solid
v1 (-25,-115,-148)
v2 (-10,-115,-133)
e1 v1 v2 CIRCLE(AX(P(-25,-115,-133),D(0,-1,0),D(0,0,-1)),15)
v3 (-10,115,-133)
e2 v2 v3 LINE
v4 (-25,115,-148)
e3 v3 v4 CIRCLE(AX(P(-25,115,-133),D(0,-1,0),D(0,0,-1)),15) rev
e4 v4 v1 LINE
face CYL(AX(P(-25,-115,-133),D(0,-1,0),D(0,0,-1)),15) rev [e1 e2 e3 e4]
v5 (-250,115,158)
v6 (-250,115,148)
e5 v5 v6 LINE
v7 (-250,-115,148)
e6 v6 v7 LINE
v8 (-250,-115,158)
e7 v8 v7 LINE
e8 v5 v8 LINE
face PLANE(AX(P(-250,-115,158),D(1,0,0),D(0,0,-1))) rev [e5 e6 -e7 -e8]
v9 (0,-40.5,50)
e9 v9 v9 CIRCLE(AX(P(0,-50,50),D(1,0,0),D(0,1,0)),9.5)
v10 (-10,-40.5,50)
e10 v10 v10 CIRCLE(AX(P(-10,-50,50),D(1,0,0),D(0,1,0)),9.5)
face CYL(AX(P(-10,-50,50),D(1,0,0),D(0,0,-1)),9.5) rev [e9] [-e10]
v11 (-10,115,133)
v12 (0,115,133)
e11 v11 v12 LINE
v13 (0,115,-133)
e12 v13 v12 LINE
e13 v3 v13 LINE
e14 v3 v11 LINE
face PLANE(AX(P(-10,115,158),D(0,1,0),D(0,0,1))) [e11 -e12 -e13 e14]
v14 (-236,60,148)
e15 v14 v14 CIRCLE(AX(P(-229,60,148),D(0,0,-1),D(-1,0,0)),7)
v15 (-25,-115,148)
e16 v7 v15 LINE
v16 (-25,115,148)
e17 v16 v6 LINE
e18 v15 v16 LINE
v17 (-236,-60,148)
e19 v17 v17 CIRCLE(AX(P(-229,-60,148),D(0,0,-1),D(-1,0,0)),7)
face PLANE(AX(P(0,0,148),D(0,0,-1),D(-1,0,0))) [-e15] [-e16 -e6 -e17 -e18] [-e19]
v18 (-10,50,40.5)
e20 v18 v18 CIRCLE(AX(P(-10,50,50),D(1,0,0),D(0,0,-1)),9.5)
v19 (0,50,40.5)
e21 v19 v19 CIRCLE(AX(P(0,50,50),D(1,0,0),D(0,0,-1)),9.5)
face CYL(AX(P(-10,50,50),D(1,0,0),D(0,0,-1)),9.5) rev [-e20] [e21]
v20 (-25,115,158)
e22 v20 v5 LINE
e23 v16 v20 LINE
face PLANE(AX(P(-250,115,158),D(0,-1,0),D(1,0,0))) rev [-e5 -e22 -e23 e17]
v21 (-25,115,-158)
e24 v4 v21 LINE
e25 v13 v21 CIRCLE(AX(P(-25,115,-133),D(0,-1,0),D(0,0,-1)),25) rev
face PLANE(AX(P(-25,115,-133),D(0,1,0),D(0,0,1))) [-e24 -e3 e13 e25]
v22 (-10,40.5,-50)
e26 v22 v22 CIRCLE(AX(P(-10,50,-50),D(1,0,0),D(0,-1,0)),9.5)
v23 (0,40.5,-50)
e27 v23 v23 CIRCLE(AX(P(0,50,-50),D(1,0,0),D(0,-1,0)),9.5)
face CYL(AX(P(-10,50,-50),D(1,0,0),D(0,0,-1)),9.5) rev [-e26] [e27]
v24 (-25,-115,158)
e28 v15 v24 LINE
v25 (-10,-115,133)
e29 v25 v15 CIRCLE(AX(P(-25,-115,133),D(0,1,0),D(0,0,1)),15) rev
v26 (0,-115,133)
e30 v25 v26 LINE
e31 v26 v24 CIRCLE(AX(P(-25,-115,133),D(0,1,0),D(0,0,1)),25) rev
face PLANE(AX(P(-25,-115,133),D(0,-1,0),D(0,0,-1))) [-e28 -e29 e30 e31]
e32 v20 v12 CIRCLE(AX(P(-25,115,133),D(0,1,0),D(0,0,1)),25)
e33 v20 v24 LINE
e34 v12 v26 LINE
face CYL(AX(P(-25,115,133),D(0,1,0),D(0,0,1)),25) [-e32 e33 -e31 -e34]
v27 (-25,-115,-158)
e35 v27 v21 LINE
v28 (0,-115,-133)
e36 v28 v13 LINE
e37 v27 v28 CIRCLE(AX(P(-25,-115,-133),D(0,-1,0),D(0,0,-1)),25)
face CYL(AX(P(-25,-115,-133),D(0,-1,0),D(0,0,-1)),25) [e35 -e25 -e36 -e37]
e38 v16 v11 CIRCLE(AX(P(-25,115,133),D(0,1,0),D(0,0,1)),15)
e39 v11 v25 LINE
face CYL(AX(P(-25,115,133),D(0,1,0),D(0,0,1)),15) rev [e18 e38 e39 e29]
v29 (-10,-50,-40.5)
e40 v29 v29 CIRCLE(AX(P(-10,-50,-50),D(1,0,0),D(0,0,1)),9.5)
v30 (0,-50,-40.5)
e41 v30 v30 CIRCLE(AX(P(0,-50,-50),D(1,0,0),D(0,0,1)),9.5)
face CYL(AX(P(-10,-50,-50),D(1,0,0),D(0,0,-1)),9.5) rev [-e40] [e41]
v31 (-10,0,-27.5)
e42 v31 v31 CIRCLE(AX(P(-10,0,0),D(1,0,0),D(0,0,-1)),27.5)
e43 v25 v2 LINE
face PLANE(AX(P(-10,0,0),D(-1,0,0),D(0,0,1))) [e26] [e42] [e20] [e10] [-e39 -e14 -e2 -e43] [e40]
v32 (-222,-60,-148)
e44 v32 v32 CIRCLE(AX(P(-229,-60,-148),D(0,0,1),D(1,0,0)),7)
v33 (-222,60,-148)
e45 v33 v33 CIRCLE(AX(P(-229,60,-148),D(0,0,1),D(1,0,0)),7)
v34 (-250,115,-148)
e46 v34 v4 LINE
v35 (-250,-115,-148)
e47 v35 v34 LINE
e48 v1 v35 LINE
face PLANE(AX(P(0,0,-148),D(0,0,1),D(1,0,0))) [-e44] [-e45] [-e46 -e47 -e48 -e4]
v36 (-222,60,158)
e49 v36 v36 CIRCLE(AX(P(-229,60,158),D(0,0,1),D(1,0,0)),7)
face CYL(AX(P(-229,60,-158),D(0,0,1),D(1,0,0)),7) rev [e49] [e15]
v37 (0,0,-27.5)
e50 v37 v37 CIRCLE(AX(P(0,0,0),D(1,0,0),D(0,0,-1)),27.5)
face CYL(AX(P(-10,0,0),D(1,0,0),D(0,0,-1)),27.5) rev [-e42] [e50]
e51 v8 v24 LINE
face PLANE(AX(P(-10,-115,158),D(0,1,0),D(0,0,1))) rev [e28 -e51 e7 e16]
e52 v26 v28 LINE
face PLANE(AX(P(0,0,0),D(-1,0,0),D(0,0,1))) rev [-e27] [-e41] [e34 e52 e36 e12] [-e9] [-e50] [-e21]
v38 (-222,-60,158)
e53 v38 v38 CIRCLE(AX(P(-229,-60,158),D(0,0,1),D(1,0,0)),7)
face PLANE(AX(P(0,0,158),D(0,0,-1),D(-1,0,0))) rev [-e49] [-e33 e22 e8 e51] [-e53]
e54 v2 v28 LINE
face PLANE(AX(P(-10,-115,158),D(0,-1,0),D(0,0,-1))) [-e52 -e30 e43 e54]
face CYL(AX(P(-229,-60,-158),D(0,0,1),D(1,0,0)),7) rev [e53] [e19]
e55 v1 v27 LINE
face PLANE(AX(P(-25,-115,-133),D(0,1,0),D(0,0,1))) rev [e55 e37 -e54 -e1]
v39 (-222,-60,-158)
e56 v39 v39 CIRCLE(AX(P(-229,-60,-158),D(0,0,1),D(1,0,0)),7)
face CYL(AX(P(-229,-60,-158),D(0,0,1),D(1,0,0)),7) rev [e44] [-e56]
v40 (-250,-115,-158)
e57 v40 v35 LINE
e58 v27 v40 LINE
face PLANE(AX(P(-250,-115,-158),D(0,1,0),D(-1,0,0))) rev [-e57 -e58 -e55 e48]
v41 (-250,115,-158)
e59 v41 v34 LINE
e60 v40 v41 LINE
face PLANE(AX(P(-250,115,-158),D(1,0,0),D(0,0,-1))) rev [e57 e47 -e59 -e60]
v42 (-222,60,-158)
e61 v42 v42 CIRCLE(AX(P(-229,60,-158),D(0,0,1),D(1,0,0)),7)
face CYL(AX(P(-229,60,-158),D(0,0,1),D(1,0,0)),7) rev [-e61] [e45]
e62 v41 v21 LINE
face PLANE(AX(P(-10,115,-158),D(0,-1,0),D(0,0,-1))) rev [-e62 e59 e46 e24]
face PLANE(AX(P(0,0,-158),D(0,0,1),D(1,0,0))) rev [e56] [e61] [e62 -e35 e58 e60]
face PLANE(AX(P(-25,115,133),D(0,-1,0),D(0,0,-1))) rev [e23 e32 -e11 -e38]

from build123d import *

# Parameters (mm, degrees)
SKETCH1_W                      = 316
SKETCH1_H                      = 230
BASE_FLANGE1_DEPTH             = 10
EDGE_FLANGE1_STRIP_W           = 70
EDGE_FLANGE1_STRIP_H           = 10
EDGE_FLANGE1_STRIP_CUT_DEPTH   = 230
EDGE_FLANGE1_STRIP_2_W         = 70
EDGE_FLANGE1_STRIP_2_H         = 10
EDGE_FLANGE1_STRIP_CUT_2_DEPTH = 230
EDGE_FLANGE1_DEPTH             = 230
EDGE_FLANGE1_BEND_DEPTH        = 230
SKETCH12_R                     = 27.5
CUT_EXTRUDE1_DEPTH             = 10
SKETCH14_R                     = 9.5
CUT_EXTRUDE3_DEPTH             = 10
CIRPATTERN1_COUNT              = 4
SKETCH17_R                     = 7
CUT_EXTRUDE4_DEPTH             = 420.023865669


# Sheet-metal steps are written as plain solids
with BuildPart() as part:
    # Sketch1 → Base-Flange1 (new body)
    with BuildSketch(Plane(origin=(0, 0, 0), x_dir=(0, 0, -1), z_dir=(1, 0, 0))):
        Rectangle(SKETCH1_W, SKETCH1_H)
    extrude(amount=-BASE_FLANGE1_DEPTH)

    # Edge-Flange1 strip (across the edge) → Edge-Flange1 strip cut (cut)
    with BuildSketch(Plane(origin=(-10, -115, 158), x_dir=(0, 0, -1), z_dir=(0, 1, 0))):
        with Locations((-10, -5)):
            Rectangle(EDGE_FLANGE1_STRIP_W, EDGE_FLANGE1_STRIP_H)
    extrude(amount=EDGE_FLANGE1_STRIP_CUT_DEPTH, mode=Mode.SUBTRACT)

    # Edge-Flange1 strip 2 (across the edge) → Edge-Flange1 strip cut 2 (cut)
    with BuildSketch(Plane(origin=(-10, 115, -158), x_dir=(0, 0, 1), z_dir=(0, -1, 0))):
        with Locations((-10, -5)):
            Rectangle(EDGE_FLANGE1_STRIP_2_W, EDGE_FLANGE1_STRIP_2_H)
    extrude(amount=EDGE_FLANGE1_STRIP_CUT_2_DEPTH, mode=Mode.SUBTRACT)

    # Edge-Flange1 section (across the edge) → Edge-Flange1 (add)
    with BuildSketch(Plane(origin=(-10, -115, 158), x_dir=(0, 0, -1), z_dir=(0, 1, 0))):
        with BuildLine():
            Line((0, 15), (0, 240))
            Line((0, 240), (10, 240))
            Line((10, 240), (10, 15))
            ThreePointArc((10, 15), (14.393398282, 4.393398282), (25, 0))
            Line((25, 0), (25, -10))
            ThreePointArc((25, -10), (7.32233047, -2.67766953), (0, 15))
        make_face()
    extrude(amount=EDGE_FLANGE1_DEPTH)

    # Edge-Flange1 section 2 (across the edge) → Edge-Flange1 bend (add)
    with BuildSketch(Plane(origin=(-10, 115, -158), x_dir=(0, 0, 1), z_dir=(0, -1, 0))):
        with BuildLine():
            Line((0, 15), (0, 240))
            Line((0, 240), (10, 240))
            Line((10, 240), (10, 15))
            ThreePointArc((10, 15), (14.393398282, 4.393398282), (25, 0))
            Line((25, 0), (25, -10))
            ThreePointArc((25, -10), (7.32233047, -2.67766953), (0, 15))
        make_face()
    extrude(amount=EDGE_FLANGE1_BEND_DEPTH)

    # Sketch12 → Cut-Extrude1 (cut)
    with BuildSketch(Plane(origin=(0, 0, 0), x_dir=(0, 0, -1), z_dir=(1, 0, 0))):
        Circle(SKETCH12_R)
    extrude(amount=-CUT_EXTRUDE1_DEPTH, mode=Mode.SUBTRACT)

    # Sketch14 → Cut-Extrude3 (cut)
    with BuildSketch(Plane(origin=(0, 0, 0), x_dir=(0, 0, -1), z_dir=(1, 0, 0))):
        with Locations((-50, 50)):
            Circle(SKETCH14_R)
    cut_extrude3 = extrude(amount=-CUT_EXTRUDE3_DEPTH, mode=Mode.SUBTRACT)

    # CirPattern1: Cut-Extrude3 ×4 about axis
    cirpattern1_axis = Axis((0, 0, 0), (1, 0, 0))
    for i in range(1, CIRPATTERN1_COUNT):
        add(cut_extrude3.rotate(cirpattern1_axis, i * 360 / CIRPATTERN1_COUNT), mode=Mode.SUBTRACT)

    # Sketch17 → Cut-Extrude4 (cut, through all)
    with BuildSketch(Plane.XY.offset(158)):
        with Locations((-229, 60)):
            Circle(SKETCH17_R)
        with Locations((-229, -60)):
            Circle(SKETCH17_R)
    extrude(amount=-CUT_EXTRUDE4_DEPTH, mode=Mode.SUBTRACT)


solid = part.part
